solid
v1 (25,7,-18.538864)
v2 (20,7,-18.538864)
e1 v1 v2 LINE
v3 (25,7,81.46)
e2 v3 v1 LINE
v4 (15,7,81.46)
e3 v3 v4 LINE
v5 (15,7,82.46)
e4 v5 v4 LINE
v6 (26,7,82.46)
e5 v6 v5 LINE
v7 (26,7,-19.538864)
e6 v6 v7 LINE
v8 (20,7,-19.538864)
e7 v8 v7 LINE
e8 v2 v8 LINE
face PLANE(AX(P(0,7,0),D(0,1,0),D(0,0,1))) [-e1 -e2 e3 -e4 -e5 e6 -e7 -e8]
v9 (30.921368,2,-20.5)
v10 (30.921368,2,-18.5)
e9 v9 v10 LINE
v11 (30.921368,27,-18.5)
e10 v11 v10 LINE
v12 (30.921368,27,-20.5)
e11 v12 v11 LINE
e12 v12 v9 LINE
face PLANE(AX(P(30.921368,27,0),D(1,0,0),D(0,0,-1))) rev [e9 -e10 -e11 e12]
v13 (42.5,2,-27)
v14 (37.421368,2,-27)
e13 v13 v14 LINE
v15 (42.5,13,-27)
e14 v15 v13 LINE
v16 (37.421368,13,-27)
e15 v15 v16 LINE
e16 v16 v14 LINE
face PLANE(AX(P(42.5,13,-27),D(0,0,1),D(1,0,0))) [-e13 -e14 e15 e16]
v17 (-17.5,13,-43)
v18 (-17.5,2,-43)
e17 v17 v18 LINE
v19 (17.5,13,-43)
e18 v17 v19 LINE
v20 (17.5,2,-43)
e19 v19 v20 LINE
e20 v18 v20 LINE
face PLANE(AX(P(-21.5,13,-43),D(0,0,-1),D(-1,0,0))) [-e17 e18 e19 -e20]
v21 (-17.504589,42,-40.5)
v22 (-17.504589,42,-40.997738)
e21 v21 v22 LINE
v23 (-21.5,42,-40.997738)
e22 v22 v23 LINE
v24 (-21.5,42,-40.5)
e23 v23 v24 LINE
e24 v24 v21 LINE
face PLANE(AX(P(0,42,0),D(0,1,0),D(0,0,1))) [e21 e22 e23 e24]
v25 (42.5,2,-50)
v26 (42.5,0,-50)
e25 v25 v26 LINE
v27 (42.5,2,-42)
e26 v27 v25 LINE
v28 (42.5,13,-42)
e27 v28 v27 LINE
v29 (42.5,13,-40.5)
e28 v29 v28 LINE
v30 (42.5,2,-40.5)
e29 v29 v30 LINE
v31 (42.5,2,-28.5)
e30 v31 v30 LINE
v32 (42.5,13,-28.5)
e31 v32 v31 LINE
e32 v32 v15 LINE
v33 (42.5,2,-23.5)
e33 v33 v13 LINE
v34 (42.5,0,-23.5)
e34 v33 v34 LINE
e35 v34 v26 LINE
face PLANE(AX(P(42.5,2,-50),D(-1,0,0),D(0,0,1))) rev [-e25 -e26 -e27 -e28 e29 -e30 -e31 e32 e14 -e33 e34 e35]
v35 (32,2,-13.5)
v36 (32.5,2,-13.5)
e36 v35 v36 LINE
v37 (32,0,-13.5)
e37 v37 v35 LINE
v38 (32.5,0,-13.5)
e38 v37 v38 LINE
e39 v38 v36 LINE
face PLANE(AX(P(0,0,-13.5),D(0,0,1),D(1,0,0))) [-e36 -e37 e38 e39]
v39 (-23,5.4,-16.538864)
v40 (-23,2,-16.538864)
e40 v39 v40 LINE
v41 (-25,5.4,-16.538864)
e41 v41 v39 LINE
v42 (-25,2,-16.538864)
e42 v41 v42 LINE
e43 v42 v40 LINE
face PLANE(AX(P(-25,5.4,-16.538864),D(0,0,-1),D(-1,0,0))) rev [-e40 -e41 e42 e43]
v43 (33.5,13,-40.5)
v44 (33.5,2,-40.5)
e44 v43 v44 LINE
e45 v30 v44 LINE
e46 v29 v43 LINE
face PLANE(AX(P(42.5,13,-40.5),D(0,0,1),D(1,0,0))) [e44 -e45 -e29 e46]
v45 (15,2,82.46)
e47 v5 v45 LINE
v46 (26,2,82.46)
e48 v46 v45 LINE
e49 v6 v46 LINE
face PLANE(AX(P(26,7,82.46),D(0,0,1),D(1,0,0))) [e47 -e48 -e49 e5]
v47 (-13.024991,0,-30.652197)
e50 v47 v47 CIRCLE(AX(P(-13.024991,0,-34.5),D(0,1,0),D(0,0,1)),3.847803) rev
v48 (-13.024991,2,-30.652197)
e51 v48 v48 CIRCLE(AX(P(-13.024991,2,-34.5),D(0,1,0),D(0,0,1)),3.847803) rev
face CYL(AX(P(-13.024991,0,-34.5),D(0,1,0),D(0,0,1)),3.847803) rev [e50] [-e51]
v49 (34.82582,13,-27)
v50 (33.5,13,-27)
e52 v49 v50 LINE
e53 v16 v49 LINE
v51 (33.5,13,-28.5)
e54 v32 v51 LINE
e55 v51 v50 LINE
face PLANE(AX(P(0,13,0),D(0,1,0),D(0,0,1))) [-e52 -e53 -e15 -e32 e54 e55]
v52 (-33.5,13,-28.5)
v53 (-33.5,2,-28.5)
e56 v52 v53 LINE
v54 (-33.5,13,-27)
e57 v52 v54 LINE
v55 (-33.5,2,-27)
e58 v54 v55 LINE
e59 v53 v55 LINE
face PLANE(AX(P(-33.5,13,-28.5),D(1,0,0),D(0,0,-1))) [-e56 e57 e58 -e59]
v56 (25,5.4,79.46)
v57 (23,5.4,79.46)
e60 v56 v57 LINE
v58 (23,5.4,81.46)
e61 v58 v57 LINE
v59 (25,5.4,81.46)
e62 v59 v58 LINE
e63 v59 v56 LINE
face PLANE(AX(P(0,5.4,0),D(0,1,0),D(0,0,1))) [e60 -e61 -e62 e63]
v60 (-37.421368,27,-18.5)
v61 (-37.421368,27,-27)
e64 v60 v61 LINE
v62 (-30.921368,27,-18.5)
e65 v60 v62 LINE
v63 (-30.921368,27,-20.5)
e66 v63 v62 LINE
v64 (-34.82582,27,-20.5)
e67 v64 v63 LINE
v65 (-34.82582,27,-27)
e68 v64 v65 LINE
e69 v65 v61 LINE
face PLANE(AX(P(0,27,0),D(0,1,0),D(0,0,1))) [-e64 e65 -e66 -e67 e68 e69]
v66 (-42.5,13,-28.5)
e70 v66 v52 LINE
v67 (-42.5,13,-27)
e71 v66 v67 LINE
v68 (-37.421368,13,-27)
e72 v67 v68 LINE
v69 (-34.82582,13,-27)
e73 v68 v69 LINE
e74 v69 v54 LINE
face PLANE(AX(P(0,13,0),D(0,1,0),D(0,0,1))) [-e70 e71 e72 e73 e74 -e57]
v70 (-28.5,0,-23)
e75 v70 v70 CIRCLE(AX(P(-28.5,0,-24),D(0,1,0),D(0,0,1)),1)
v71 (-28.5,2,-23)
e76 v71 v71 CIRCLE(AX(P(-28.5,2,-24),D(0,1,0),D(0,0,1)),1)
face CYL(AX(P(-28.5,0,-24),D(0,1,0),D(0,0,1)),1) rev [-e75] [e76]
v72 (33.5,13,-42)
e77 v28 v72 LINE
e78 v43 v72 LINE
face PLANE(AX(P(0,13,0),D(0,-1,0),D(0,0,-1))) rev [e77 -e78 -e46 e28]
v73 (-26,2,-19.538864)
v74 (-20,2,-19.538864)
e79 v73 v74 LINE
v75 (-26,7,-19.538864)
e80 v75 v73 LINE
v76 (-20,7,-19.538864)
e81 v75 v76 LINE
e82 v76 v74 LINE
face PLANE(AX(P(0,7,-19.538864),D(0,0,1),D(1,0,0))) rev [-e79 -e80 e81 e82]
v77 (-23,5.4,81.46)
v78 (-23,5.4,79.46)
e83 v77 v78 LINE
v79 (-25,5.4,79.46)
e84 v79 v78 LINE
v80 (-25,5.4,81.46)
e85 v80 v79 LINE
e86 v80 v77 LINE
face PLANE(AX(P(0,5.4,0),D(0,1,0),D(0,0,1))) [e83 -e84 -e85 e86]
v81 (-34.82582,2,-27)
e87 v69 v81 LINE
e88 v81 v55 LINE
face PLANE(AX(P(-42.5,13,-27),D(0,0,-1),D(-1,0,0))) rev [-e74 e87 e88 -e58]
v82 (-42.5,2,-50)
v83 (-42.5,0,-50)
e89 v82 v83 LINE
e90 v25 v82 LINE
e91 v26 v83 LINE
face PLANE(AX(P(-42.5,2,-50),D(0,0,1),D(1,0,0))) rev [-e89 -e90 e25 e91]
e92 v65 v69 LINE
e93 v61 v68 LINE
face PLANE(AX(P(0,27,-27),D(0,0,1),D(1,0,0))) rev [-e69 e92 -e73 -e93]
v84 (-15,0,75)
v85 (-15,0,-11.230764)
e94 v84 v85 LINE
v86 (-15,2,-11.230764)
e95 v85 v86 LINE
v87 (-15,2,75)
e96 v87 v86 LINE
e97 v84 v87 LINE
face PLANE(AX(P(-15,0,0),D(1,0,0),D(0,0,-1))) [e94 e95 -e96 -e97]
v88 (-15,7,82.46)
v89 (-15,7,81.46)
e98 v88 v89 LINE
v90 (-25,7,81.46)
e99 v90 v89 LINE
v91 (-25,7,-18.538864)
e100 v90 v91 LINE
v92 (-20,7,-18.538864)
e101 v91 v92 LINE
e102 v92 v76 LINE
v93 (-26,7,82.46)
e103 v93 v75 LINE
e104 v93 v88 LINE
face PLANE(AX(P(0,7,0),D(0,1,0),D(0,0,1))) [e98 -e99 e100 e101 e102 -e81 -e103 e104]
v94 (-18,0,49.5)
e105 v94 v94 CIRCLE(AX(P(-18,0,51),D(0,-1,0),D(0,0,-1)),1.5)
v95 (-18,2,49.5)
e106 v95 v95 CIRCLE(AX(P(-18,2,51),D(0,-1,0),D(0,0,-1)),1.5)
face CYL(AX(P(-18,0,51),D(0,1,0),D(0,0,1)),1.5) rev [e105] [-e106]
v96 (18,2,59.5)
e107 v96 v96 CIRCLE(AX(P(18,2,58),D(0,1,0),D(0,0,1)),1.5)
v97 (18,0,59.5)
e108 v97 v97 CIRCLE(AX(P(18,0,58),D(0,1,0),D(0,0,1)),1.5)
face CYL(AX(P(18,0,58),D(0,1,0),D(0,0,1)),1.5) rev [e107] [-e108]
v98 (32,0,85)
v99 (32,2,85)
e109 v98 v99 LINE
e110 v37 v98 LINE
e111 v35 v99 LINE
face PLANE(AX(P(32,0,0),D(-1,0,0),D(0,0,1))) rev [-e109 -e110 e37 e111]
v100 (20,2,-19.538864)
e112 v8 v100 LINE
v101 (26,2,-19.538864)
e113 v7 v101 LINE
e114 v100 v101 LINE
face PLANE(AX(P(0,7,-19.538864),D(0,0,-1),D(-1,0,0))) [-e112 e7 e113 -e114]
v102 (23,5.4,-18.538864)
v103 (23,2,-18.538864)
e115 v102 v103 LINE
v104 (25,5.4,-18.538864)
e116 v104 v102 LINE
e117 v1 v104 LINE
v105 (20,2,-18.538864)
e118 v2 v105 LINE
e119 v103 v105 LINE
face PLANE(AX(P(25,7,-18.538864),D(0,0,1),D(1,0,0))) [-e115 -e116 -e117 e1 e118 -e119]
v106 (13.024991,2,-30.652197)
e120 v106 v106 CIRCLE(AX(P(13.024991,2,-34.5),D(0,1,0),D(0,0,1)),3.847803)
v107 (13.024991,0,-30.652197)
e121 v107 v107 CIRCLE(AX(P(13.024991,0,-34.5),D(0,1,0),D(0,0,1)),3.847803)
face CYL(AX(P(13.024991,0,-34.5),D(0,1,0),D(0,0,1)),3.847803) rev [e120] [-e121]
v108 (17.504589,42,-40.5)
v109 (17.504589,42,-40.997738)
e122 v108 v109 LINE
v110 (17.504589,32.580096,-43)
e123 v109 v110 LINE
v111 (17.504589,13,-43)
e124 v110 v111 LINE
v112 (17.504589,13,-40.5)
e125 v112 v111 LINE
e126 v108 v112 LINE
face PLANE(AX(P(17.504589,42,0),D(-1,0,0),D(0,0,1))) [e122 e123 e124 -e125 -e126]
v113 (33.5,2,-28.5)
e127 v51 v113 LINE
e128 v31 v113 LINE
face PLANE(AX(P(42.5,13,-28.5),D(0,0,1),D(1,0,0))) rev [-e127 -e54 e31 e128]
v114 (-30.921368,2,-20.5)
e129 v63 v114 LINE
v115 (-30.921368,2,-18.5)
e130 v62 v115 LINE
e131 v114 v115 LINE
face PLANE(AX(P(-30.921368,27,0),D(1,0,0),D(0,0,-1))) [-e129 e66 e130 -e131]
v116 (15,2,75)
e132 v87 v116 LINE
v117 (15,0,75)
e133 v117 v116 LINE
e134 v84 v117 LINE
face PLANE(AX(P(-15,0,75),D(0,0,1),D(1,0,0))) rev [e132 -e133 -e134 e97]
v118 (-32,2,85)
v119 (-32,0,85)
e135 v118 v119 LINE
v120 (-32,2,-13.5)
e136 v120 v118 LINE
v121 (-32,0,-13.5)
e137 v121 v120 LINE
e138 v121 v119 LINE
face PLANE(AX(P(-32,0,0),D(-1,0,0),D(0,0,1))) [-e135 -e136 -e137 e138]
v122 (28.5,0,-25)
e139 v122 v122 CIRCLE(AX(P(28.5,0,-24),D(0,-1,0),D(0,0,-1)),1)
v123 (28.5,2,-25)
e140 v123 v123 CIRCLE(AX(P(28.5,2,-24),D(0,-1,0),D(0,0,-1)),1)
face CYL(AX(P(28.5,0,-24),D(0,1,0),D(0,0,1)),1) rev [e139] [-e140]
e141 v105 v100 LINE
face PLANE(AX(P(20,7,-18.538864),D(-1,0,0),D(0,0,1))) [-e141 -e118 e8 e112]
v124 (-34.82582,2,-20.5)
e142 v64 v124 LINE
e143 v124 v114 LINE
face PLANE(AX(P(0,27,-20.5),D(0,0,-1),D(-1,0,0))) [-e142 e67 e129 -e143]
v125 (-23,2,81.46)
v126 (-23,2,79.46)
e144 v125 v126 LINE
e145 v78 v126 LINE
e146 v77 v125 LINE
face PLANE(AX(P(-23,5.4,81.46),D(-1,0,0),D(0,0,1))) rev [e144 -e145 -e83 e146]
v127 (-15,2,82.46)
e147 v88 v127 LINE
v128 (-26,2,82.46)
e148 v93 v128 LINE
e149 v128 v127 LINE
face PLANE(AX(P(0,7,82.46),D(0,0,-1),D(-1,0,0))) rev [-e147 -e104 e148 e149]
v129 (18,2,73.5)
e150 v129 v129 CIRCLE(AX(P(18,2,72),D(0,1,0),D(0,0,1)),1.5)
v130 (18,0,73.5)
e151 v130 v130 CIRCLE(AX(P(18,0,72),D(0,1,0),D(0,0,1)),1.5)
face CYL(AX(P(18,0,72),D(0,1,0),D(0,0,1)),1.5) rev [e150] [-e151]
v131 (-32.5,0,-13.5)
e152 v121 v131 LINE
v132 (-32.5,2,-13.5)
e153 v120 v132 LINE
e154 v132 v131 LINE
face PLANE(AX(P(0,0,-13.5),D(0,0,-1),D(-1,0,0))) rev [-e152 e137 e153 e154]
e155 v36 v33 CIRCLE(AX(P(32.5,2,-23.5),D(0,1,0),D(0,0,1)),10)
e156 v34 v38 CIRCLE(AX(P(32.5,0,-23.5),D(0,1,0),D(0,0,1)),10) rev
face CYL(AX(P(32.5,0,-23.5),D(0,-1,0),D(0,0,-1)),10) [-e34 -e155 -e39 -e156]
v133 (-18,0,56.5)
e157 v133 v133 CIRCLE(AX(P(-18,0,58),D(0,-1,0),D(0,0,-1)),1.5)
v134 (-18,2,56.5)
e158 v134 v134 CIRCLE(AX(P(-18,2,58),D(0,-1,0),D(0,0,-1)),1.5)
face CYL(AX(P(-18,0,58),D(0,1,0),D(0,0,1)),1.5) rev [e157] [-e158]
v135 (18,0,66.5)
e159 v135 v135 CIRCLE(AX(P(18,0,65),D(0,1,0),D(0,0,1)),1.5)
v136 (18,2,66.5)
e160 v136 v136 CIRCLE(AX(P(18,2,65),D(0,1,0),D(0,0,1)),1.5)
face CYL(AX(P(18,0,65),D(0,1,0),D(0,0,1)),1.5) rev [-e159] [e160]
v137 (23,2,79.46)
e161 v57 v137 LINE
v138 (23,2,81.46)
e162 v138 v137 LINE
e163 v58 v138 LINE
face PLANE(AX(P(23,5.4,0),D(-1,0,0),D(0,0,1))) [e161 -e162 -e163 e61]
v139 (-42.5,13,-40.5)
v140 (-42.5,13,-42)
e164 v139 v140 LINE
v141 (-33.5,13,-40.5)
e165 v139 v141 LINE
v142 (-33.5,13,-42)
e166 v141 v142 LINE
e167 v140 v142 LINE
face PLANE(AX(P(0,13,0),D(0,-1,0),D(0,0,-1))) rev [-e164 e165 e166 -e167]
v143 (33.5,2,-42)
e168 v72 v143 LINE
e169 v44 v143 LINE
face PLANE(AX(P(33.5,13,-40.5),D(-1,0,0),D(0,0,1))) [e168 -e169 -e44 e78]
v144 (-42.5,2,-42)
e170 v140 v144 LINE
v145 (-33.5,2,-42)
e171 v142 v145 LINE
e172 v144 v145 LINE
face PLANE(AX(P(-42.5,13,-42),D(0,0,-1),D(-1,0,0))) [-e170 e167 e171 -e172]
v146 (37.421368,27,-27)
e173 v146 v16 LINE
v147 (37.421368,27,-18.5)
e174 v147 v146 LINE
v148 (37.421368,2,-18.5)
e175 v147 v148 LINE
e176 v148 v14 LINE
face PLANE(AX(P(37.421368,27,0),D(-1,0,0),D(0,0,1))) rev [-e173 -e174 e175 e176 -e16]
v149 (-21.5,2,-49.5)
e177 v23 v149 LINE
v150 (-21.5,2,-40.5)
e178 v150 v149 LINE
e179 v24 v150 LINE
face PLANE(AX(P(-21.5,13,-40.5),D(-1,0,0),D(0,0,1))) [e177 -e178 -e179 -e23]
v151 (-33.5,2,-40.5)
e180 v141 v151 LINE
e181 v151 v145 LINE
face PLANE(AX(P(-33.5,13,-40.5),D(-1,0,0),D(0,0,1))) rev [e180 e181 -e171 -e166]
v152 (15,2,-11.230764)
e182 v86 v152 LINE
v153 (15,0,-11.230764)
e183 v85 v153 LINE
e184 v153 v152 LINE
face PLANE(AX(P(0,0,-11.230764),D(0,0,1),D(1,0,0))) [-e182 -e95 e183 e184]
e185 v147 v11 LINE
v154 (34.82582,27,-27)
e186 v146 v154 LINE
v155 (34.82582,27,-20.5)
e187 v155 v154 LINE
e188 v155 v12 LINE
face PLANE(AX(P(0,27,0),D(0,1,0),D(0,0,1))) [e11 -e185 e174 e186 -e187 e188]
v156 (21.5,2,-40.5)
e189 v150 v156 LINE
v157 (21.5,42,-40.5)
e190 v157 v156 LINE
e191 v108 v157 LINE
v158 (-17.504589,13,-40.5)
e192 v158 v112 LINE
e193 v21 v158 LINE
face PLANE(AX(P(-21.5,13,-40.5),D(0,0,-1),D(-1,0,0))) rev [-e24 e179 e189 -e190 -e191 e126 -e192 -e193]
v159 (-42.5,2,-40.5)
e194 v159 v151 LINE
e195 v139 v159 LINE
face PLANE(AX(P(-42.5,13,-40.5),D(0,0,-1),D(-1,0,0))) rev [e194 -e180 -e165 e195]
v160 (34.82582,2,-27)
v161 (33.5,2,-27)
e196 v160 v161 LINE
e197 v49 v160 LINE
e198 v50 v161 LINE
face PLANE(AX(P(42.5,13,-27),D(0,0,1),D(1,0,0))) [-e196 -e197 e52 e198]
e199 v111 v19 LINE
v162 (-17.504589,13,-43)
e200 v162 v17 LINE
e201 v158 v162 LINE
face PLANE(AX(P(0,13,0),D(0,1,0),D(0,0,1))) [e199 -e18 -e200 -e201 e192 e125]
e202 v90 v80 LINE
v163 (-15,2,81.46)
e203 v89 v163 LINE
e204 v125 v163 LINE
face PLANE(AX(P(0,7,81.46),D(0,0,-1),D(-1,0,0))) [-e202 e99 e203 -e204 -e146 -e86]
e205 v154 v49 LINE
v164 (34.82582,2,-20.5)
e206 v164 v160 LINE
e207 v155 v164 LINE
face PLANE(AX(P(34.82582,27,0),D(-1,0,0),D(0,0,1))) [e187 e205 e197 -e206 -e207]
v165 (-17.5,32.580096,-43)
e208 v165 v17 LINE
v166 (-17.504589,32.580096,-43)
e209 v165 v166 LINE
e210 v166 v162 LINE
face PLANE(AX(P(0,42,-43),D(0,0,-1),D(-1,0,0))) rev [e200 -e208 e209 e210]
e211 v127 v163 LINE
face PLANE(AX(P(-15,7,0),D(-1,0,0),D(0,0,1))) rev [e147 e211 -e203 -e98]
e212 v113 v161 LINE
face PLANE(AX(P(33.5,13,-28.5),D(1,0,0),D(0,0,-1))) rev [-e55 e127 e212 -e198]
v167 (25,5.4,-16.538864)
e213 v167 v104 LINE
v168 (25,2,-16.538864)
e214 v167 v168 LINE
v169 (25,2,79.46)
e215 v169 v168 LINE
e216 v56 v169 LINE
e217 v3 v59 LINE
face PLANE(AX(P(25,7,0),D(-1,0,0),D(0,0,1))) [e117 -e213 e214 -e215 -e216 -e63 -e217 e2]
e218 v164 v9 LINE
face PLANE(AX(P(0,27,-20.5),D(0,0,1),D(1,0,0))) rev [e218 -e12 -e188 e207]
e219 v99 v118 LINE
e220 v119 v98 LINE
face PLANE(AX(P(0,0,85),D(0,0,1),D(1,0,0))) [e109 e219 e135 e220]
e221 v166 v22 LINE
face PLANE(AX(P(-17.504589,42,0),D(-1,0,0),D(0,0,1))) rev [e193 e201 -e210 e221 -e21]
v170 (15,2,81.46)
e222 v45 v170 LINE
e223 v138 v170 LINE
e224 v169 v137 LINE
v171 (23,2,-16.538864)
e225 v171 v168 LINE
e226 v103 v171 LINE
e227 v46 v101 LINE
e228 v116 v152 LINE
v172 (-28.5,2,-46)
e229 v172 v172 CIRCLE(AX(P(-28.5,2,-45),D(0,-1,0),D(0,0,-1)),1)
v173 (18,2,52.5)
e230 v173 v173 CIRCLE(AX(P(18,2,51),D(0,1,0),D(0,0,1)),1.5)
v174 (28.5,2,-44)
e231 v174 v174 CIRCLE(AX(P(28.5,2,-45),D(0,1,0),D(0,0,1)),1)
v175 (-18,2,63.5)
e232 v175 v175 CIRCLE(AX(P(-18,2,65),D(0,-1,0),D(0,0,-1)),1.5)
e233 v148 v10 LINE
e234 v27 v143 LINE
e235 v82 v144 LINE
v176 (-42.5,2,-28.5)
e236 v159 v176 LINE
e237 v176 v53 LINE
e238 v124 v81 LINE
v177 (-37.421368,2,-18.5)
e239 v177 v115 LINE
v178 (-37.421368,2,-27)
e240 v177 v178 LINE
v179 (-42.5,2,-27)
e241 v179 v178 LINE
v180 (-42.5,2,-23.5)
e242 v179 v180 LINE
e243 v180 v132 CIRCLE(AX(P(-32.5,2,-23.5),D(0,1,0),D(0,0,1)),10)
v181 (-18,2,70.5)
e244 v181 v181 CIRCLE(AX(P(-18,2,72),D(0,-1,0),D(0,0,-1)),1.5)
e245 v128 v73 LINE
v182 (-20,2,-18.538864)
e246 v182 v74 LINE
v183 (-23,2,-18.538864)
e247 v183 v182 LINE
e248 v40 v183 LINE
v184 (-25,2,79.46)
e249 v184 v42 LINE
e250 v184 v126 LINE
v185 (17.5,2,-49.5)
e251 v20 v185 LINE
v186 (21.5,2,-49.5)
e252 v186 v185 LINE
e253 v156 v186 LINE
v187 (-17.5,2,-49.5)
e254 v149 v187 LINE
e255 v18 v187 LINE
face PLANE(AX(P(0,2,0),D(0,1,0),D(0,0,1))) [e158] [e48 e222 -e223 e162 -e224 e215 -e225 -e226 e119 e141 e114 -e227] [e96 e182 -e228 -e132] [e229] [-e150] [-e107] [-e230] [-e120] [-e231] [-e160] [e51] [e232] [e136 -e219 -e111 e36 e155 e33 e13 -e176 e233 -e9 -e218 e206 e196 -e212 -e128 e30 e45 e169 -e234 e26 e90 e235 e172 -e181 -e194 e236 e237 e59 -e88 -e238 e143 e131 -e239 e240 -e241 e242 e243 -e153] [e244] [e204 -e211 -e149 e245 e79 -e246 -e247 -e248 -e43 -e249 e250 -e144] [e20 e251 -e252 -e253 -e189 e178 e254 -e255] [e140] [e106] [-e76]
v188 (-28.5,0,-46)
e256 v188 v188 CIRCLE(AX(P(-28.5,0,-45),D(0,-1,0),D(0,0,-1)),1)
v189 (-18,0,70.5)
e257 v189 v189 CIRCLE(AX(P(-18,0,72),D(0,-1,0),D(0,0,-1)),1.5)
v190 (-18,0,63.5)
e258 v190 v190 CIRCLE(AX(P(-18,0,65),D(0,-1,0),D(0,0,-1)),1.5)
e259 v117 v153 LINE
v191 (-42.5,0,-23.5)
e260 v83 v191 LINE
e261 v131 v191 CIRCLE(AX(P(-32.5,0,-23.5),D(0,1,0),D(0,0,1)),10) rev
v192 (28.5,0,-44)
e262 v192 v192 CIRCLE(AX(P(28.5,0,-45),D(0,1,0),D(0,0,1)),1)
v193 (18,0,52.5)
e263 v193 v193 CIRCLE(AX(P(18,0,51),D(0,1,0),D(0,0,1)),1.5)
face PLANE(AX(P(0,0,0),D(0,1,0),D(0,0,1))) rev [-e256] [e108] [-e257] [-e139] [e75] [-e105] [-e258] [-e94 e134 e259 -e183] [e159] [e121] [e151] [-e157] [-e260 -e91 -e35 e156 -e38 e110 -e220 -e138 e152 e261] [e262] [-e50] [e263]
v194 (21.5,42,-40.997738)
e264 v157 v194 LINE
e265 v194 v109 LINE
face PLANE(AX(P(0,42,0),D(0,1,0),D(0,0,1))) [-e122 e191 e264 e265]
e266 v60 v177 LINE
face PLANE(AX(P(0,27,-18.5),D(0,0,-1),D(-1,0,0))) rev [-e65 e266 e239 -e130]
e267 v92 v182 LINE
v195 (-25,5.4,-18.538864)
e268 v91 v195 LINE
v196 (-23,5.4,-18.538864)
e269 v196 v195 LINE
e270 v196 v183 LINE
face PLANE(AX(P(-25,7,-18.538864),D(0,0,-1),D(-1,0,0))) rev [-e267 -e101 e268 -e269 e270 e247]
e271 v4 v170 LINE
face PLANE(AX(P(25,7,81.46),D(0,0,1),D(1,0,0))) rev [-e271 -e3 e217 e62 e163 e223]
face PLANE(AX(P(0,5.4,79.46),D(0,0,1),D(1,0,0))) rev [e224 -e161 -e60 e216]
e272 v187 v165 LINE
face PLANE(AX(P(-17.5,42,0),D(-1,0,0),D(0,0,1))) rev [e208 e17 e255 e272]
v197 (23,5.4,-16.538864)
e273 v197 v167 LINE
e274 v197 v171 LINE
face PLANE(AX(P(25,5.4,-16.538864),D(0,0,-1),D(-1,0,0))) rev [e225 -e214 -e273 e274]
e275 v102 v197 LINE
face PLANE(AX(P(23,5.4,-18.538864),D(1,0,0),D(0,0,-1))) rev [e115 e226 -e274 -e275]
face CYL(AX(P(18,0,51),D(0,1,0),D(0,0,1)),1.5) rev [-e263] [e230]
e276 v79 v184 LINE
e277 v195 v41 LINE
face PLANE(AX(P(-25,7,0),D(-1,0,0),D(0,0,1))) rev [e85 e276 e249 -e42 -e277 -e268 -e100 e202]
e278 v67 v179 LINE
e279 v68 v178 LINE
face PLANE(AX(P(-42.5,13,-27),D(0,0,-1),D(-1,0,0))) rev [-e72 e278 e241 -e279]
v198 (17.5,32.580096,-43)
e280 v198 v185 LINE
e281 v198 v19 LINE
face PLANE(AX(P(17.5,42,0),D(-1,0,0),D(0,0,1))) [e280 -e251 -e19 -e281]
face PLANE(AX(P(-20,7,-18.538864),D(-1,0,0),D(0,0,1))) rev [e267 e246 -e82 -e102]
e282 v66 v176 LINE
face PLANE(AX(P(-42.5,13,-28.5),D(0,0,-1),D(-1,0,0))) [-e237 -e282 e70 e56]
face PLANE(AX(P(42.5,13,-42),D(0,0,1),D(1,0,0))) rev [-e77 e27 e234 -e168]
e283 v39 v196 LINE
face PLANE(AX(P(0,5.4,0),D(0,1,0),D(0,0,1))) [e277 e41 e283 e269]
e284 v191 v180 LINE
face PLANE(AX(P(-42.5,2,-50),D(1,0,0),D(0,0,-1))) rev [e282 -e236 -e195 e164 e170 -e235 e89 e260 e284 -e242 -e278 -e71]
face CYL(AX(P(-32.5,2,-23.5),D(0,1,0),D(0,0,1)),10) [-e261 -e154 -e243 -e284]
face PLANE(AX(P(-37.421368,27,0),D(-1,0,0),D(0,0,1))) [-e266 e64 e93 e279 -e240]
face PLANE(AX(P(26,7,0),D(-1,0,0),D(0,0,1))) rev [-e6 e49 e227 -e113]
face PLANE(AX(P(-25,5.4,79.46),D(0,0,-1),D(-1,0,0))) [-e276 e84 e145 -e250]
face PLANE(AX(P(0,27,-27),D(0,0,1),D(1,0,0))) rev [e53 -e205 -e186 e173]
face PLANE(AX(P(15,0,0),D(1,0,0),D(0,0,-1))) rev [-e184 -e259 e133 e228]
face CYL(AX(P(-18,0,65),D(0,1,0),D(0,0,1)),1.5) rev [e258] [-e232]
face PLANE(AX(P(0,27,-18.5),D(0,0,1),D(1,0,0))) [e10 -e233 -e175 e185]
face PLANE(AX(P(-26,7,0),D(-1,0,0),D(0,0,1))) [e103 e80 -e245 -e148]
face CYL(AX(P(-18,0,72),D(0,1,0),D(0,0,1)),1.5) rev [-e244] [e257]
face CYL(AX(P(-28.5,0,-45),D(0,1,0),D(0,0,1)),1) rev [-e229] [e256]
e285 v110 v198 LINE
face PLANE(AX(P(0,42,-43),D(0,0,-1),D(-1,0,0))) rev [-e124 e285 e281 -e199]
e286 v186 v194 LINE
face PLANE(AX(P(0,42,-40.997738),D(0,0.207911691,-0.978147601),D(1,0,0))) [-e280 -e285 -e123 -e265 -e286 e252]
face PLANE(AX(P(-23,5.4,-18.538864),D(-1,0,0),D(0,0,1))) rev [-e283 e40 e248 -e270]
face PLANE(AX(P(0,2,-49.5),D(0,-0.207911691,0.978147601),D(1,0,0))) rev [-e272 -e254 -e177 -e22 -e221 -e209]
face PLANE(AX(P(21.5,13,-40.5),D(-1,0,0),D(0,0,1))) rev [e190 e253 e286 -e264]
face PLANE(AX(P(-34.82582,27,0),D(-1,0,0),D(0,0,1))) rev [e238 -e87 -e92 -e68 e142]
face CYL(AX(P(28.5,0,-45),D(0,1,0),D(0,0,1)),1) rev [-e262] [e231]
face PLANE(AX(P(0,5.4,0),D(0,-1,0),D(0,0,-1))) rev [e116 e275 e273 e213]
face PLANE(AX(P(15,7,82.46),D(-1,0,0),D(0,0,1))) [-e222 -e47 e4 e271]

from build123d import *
from OCP.BRepFilletAPI import BRepFilletAPI_MakeChamfer

# Parameters (mm, degrees)
BASE_W               = 85
BASE_H               = 100
BOSS_EXTRUDE2_DEPTH  = 2
SKETCH3_W            = 9
SKETCH3_H            = 1.5
SKETCH3_W_2          = 43
SKETCH3_H_2          = 2.5
BOSS_EXTRUDE4_DEPTH  = 11
SKETCH13_W           = 15
SKETCH13_H           = 61.230763763
SKETCH13_R           = 1
CUT_EXTRUDE2_DEPTH   = 67.537583365
SKETCH14_W           = 2.595547293
SKETCH14_H           = 6.5
SKETCH14_W_2         = 6.5
SKETCH14_H_2         = 2
BOSS_EXTRUDE5_DEPTH  = 25
SKETCH16_W           = 3.995410841
SKETCH16_H           = 2.5
BOSS_EXTRUDE6_DEPTH  = 29
SKETCH18_W           = 4
SKETCH18_H           = 6.5
BOSS_EXTRUDE7_DEPTH  = 40
CHAMFER1_SIZE        = 8.502262467
CHAMFER1_SIZE_2      = 40
SKETCH19_W           = 10.5
SKETCH19_H           = 63.5
CUT_EXTRUDE3_DEPTH   = 77.852130745
BOSS_EXTRUDE8_DEPTH  = 5
FILLET1_R            = 10
SKETCH21_W           = 2
SKETCH21_H           = 2
BOSS_EXTRUDE9_DEPTH  = 3.4
SKETCH22_W           = 64
SKETCH22_H           = 2
BOSS_EXTRUDE10_DEPTH = 35
SKETCH23_R           = 1.5
SKETCH23_W           = 30
SKETCH23_H           = 27.486629776
CUT_EXTRUDE4_DEPTH   = 104.107953137
SKETCH24_W           = 1
SKETCH24_H           = 32.46
SKETCH24_W_2         = 10
SKETCH24_H_2         = 1
BOSS_EXTRUDE11_DEPTH = 5
SKETCH26_W           = 2
SKETCH26_H           = 2
BOSS_EXTRUDE13_DEPTH = 3.4


with BuildPart() as part:
    # base → Boss-Extrude2 (new body)
    with BuildSketch(Plane(origin=(0, 0, 0), x_dir=(1, 0, 0), z_dir=(0, 1, 0))):
        Rectangle(BASE_W, BASE_H)
    extrude(amount=BOSS_EXTRUDE2_DEPTH)

    # Sketch3 → Boss-Extrude4 (add)
    with BuildSketch(Plane(origin=(0, 2, 0), x_dir=(1, 0, 0), z_dir=(0, 1, 0))):
        with Locations((38, 41.25)):
            Rectangle(SKETCH3_W, SKETCH3_H)
        with Locations((38, 27.75)):
            Rectangle(SKETCH3_W, SKETCH3_H)
        with Locations((-38, 41.25)):
            Rectangle(SKETCH3_W, SKETCH3_H)
        with Locations((-38, 27.75)):
            Rectangle(SKETCH3_W, SKETCH3_H)
        with Locations((0, 41.75)):
            Rectangle(SKETCH3_W_2, SKETCH3_H_2)
    extrude(amount=BOSS_EXTRUDE4_DEPTH)

    # Sketch13 → Cut-Extrude2 (cut, through all)
    with BuildSketch(Plane(origin=(0, 2, 0), x_dir=(1, 0, 0), z_dir=(0, 1, 0))):
        with BuildLine():
            ThreePointArc((-16.872793903, 34.5), (-13.024991104, 30.652197201), (-9.177188305, 34.5))
            Line((-9.177188305, 34.5), (-16.872793903, 34.5))
        make_face()
        with BuildLine():
            Line((-16.872793903, 34.5), (-9.177188305, 34.5))
            ThreePointArc((-9.177188305, 34.5), (-13.024991104, 38.347802799), (-16.872793903, 34.5))
        make_face()
        with BuildLine():
            ThreePointArc((9.177188305, 34.5), (13.024991104, 30.652197201), (16.872793903, 34.5))
            Line((16.872793903, 34.5), (9.177188305, 34.5))
        make_face()
        with BuildLine():
            Line((9.177188305, 34.5), (16.872793903, 34.5))
            ThreePointArc((16.872793903, 34.5), (13.024991104, 38.347802799), (9.177188305, 34.5))
        make_face()
        with Locations((-7.5, -19.384618119)):
            Rectangle(SKETCH13_W, SKETCH13_H)
        with Locations((7.5, -19.384618119)):
            Rectangle(SKETCH13_W, SKETCH13_H)
        with Locations(Location((28.5, 45, 0), (0, 0, 270))):
            Circle(SKETCH13_R)
        with Locations(Location((28.5, 24, 0), (0, 0, 90))):
            Circle(SKETCH13_R)
        with Locations(Location((-28.5, 24, 0), (0, 0, 270))):
            Circle(SKETCH13_R)
        with Locations(Location((-28.5, 45, 0), (0, 0, 90))):
            Circle(SKETCH13_R)
    extrude(amount=-CUT_EXTRUDE2_DEPTH, mode=Mode.SUBTRACT)

    # Sketch14 → Boss-Extrude5 (add)
    with BuildSketch(Plane(origin=(0, 2, 0), x_dir=(1, 0, 0), z_dir=(0, 1, 0))):
        with Locations((-36.123593927, 23.75)):
            Rectangle(SKETCH14_W, SKETCH14_H)
        with Locations((-34.171367573, 19.5)):
            Rectangle(SKETCH14_W_2, SKETCH14_H_2)
        with Locations((36.123593927, 23.75)):
            Rectangle(SKETCH14_W, SKETCH14_H)
        Polygon((37.421367573, 20.5), (34.82582028, 20.5), (30.921367573, 20.5), (30.921367573, 18.5), (37.421367573, 18.5), align=None)
    extrude(amount=BOSS_EXTRUDE5_DEPTH)

    # Sketch16 → Boss-Extrude6 (add)
    with BuildSketch(Plane(origin=(0, 13, 0), x_dir=(1, 0, 0), z_dir=(0, 1, 0))):
        with Locations((-19.50229458, 41.75)):
            Rectangle(SKETCH16_W, SKETCH16_H)
        with Locations((19.50229458, 41.75)):
            Rectangle(SKETCH16_W, SKETCH16_H)
    extrude(amount=BOSS_EXTRUDE6_DEPTH)

    # Sketch18 → Boss-Extrude7 (add)
    with BuildSketch(Plane(origin=(0, 2, 0), x_dir=(1, 0, 0), z_dir=(0, 1, 0))):
        with Locations((-19.5, 46.25)):
            Rectangle(SKETCH18_W, SKETCH18_H)
        with Locations((19.5, 46.25)):
            Rectangle(SKETCH18_W, SKETCH18_H)
    extrude(amount=BOSS_EXTRUDE7_DEPTH)

    # Chamfer1
    chamfer1_edges_1 = [part.edges().sort_by_distance(p)[0] for p in [
        (-19.5, 42, -49.5),
    ]]
    chamfer1_side_1 = [part.faces().sort_by_distance(p)[0] for p in [
        (-19.5, 42, -49.329954751),
    ]]
    chamfer1_edges_2 = [part.edges().sort_by_distance(p)[0] for p in [
        (19.5, 42, -49.5),
    ]]
    chamfer1_side_2 = [part.faces().sort_by_distance(p)[0] for p in [
        (19.5, 42, -49.329954751),
    ]]
    chamfer1 = BRepFilletAPI_MakeChamfer(part.part.solid().wrapped)
    for e in chamfer1_edges_1:
        chamfer1.Add(CHAMFER1_SIZE - 0.0001, CHAMFER1_SIZE_2 - 0.0001, e.wrapped, chamfer1_side_1[0].wrapped)
    for e in chamfer1_edges_2:
        chamfer1.Add(CHAMFER1_SIZE - 0.0001, CHAMFER1_SIZE_2 - 0.0001, e.wrapped, chamfer1_side_2[0].wrapped)
    add(Compound.cast(chamfer1.Shape()), mode=Mode.REPLACE)  # a hair under: the kernel refuses the full size

    # Sketch19 → Cut-Extrude3 (cut, through all)
    with BuildSketch(Plane(origin=(0, 2, 0), x_dir=(1, 0, 0), z_dir=(0, 1, 0))):
        with Locations((-37.25, -18.25)):
            Rectangle(SKETCH19_W, SKETCH19_H)
        with Locations((37.25, -18.25)):
            Rectangle(SKETCH19_W, SKETCH19_H)
    extrude(amount=-CUT_EXTRUDE3_DEPTH, mode=Mode.SUBTRACT)

    # Sketch20 → Boss-Extrude8 (add)
    with BuildSketch(Plane(origin=(0, 2, 0), x_dir=(1, 0, 0), z_dir=(0, 1, 0))):
        Polygon((-26, -50), (-25, -50), (-25, 18.538863673), (-20, 18.538863673), (-20, 19.538863673), (-26, 19.538863673), align=None)
        Polygon((20, 18.538863673), (25, 18.538863673), (25, -50), (26, -50), (26, 19.538863673), (20, 19.538863673), align=None)
    extrude(amount=BOSS_EXTRUDE8_DEPTH)

    # Fillet1
    fillet1_edges = [part.edges().sort_by_distance(p)[0] for p in [
        (-42.5, 1, -13.5),
        (42.5, 1, -13.5),
    ]]
    fillet(fillet1_edges, radius=FILLET1_R)

    # Sketch21 → Boss-Extrude9 (add)
    with BuildSketch(Plane(origin=(0, 2, 0), x_dir=(1, 0, 0), z_dir=(0, 1, 0))):
        with Locations((-24, 17.538863673)):
            Rectangle(SKETCH21_W, SKETCH21_H)
        with Locations((24, 17.538863673)):
            Rectangle(SKETCH21_W, SKETCH21_H)
    extrude(amount=BOSS_EXTRUDE9_DEPTH)

    # Sketch22 → Boss-Extrude10 (add)
    with BuildSketch(Plane.XY.offset(50)):
        with Locations((0, 1)):
            Rectangle(SKETCH22_W, SKETCH22_H)
    extrude(amount=BOSS_EXTRUDE10_DEPTH)

    # Sketch23 → Cut-Extrude4 (cut, through all)
    with BuildSketch(Plane(origin=(0, 2, 0), x_dir=(1, 0, 0), z_dir=(0, 1, 0))):
        with Locations(Location((18, -72, 0), (0, 0, 270))):
            Circle(SKETCH23_R)
        with Locations(Location((18, -65, 0), (0, 0, 270))):
            Circle(SKETCH23_R)
        with Locations(Location((18, -58, 0), (0, 0, 270))):
            Circle(SKETCH23_R)
        with Locations(Location((18, -51, 0), (0, 0, 270))):
            Circle(SKETCH23_R)
        with Locations(Location((-18, -51, 0), (0, 0, 90))):
            Circle(SKETCH23_R)
        with Locations(Location((-18, -58, 0), (0, 0, 90))):
            Circle(SKETCH23_R)
        with Locations(Location((-18, -65, 0), (0, 0, 90))):
            Circle(SKETCH23_R)
        with Locations(Location((-18, -72, 0), (0, 0, 90))):
            Circle(SKETCH23_R)
        with Locations((0, -61.256685112)):
            Rectangle(SKETCH23_W, SKETCH23_H)
    extrude(amount=-CUT_EXTRUDE4_DEPTH, mode=Mode.SUBTRACT)

    # Sketch24 → Boss-Extrude11 (add)
    with BuildSketch(Plane(origin=(0, 2, 0), x_dir=(1, 0, 0), z_dir=(0, 1, 0))):
        with Locations((-25.5, -66.23)):
            Rectangle(SKETCH24_W, SKETCH24_H)
        with Locations((-20, -81.96)):
            Rectangle(SKETCH24_W_2, SKETCH24_H_2)
        with Locations((25.5, -66.23)):
            Rectangle(SKETCH24_W, SKETCH24_H)
        with Locations((20, -81.96)):
            Rectangle(SKETCH24_W_2, SKETCH24_H_2)
    extrude(amount=BOSS_EXTRUDE11_DEPTH)

    # Sketch26 → Boss-Extrude13 (add)
    with BuildSketch(Plane(origin=(0, 2, 0), x_dir=(1, 0, 0), z_dir=(0, 1, 0))):
        with Locations((24, -80.46)):
            Rectangle(SKETCH26_W, SKETCH26_H)
        with Locations((-24, -80.46)):
            Rectangle(SKETCH26_W, SKETCH26_H)
    extrude(amount=BOSS_EXTRUDE13_DEPTH)


solid = part.part
